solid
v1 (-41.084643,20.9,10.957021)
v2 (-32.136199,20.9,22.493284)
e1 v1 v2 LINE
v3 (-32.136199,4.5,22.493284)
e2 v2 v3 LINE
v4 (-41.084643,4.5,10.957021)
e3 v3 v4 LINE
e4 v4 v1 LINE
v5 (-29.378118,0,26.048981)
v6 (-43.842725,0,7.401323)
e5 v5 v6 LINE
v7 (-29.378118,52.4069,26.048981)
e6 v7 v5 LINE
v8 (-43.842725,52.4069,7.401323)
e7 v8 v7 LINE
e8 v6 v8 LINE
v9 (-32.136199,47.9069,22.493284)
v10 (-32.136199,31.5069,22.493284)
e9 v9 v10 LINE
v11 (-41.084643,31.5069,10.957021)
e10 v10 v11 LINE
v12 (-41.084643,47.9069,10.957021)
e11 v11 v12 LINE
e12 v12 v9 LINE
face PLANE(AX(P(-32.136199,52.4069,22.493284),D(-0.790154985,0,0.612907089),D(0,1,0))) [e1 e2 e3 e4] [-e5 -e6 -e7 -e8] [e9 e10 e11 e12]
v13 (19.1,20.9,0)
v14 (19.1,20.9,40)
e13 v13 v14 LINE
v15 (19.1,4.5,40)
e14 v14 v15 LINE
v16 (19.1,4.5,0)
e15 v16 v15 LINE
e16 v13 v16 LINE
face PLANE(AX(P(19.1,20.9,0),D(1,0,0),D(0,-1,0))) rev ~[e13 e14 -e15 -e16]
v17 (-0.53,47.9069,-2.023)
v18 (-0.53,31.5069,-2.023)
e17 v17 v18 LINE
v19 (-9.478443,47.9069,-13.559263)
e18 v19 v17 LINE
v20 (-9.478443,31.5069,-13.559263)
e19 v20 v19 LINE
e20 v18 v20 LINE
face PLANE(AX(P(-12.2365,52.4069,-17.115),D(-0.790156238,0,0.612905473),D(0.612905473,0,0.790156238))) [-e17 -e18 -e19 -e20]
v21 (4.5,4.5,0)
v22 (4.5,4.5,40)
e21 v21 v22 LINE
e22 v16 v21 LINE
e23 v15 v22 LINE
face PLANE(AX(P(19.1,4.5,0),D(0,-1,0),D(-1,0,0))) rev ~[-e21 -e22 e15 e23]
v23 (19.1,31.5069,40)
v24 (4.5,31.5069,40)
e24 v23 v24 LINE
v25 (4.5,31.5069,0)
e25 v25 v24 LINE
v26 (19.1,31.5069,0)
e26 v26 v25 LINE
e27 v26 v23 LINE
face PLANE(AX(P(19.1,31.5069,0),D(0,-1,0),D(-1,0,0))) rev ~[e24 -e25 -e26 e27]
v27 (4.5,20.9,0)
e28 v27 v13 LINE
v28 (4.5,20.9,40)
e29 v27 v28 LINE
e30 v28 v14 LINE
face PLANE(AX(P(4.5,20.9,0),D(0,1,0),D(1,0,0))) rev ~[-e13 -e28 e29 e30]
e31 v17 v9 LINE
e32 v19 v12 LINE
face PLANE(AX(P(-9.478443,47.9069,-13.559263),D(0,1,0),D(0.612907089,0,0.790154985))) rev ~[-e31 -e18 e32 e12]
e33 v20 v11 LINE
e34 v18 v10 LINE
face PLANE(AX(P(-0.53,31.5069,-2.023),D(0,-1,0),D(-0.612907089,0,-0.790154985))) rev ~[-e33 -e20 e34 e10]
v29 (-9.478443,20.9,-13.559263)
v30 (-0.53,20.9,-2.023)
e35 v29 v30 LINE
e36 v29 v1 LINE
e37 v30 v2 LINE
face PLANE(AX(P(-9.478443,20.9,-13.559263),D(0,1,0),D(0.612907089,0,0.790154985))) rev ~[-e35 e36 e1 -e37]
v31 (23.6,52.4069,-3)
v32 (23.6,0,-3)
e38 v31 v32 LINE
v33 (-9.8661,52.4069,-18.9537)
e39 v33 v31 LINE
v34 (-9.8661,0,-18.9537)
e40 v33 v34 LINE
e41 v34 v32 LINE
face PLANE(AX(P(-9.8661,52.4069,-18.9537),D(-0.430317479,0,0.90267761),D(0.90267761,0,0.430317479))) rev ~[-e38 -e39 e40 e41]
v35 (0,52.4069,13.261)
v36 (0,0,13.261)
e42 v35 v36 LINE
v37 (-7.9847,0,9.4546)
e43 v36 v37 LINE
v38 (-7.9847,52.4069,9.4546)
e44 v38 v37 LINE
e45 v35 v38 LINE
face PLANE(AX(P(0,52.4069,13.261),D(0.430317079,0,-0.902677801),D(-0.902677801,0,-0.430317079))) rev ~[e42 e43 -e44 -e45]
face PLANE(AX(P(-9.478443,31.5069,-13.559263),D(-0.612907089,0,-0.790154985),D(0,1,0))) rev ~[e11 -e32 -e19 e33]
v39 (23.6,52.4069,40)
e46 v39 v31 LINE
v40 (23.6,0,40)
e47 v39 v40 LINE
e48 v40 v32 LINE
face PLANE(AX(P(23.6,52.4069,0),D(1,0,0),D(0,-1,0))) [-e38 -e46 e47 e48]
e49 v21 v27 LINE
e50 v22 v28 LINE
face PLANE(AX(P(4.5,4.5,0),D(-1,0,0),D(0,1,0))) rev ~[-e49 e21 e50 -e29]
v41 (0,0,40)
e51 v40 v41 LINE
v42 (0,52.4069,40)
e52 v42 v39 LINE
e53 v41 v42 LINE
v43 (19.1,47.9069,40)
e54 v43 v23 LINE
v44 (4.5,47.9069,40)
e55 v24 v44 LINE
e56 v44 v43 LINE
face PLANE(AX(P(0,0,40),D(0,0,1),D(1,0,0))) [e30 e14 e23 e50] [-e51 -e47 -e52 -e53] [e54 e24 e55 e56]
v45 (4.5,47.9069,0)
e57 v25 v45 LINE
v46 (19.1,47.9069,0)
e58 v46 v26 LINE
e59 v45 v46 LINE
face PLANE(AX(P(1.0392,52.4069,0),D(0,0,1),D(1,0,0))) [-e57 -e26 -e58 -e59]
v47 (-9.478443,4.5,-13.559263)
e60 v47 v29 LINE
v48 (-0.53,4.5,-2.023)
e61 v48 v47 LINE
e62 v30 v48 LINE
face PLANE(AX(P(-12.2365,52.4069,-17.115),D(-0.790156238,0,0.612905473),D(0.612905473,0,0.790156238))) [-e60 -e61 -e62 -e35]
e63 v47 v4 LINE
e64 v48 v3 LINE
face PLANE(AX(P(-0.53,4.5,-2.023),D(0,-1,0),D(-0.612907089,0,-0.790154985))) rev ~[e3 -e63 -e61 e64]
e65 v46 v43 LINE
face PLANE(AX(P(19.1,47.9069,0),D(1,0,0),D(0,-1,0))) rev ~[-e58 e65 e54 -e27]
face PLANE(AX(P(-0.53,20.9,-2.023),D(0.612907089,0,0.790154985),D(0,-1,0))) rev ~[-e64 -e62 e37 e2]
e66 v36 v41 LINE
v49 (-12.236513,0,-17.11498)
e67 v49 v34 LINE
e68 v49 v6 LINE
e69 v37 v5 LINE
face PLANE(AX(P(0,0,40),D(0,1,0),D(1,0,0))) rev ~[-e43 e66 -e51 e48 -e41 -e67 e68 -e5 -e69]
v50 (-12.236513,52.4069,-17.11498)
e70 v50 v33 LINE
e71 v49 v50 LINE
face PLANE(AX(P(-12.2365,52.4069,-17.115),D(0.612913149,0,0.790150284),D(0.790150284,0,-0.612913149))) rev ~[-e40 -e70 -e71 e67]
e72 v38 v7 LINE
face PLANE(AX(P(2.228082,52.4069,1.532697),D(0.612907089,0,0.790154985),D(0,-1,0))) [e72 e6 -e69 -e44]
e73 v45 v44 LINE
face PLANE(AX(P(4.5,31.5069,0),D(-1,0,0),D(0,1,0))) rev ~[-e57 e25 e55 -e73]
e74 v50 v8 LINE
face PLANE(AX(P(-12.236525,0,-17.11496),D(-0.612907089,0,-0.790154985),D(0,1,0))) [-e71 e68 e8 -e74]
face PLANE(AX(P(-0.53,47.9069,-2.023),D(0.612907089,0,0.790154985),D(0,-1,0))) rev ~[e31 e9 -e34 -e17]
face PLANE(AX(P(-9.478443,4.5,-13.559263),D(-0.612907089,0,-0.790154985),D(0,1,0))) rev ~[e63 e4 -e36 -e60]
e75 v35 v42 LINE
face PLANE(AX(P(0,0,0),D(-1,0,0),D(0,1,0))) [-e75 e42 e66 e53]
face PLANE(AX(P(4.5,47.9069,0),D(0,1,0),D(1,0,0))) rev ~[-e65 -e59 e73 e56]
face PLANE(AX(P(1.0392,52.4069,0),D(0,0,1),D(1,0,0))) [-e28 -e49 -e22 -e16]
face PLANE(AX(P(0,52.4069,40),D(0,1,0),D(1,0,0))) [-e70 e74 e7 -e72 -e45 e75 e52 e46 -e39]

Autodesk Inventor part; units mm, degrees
ref_plane "YZ Plane" through (0, 0, 0) normal (1, 0, 0) x (0, 1, 0)
ref_plane "XZ Plane" through (0, 0, 0) normal (0, 1, 0) x (-1, 0, 0)
sketch "Sketch1" plane through (0, 0, 0) normal (0, 0, 1) x (1, 0, 0)
  line L0 (19.1, 20.9) -> (4.5, 20.9) construction
  line L1 (19.1, 20.9) -> (19.1, 4.5) construction
  line L2 (19.1, 4.5) -> (4.5, 4.5) construction
  line L3 (4.5, 4.5) -> (4.5, 20.9) construction
  line L4 (4.5, 47.9069) -> (4.5, 31.5069) construction
  line L5 (19.1, 47.9069) -> (4.5, 47.9069) construction
  line L6 (19.1, 31.5069) -> (19.1, 47.9069) construction
  line L7 (4.5, 31.5069) -> (19.1, 31.5069) construction
  line L8 (0, 0) -> (0, 52.4069) construction
  line L9 (0, 0) -> (23.6, 0) construction
  line L10 (23.6, 0) -> (23.6, 52.4069) construction
  line L11 (0, 52.4069) -> (23.6, 52.4069) construction
  line L12 (0, 52.4069) -> (0, 0) construction
  line L13 (23.6, 0) -> (23.6, 52.4069) construction
  line L14 (0, 52.4069) -> (23.6, 52.4069)
  line L15 (23.6, 52.4069) -> (23.6, 0)
  line L16 (23.6, 0) -> (0, 0)
  line L17 (0, 0) -> (0, 52.4069)
  line L18 (4.5, 4.5) -> (4.5, 20.9) construction
  line L19 (19.1, 20.9) -> (19.1, 4.5) construction
  line L20 (4.5, 20.9) -> (19.1, 20.9)
  line L21 (19.1, 20.9) -> (19.1, 4.5)
  line L22 (19.1, 4.5) -> (4.5, 4.5)
  line L23 (4.5, 4.5) -> (4.5, 20.9)
  line L24 (4.5, 47.9069) -> (19.1, 47.9069)
  line L25 (19.1, 47.9069) -> (19.1, 31.5069)
  line L26 (19.1, 31.5069) -> (4.5, 31.5069)
  line L27 (4.5, 31.5069) -> (4.5, 47.9069)
  point P0 (0, 0)
  point P1 (-49.87, 37.7316)
extrude "Extrusion1" add sketch "Sketch1" along normal blind 40
sketch "Sketch2" plane through (0, 52.4069, 0) normal (0, 1, 0) x (1, 0, 0)
  line L0 (0, 0) -> (23.6, 0) construction
  line L1 (0, 0) -> (0, -40) construction
  line L2 (23.6, -40) -> (0, -40) construction
  line L3 (23.6, 0) -> (23.6, -40) construction
  line L4 (4.5, 0) -> (-0.53, 0)
  line L5 (4.5, 0) -> (9.53, 0) construction
  line L6 (-0.53, 0) -> (-0.53, 2.023)
  line L7 (-0.53, 0) -> (1.493, 0) construction
ref_plane "Work Plane1" through (-0.53, 52.4069, -2.023) normal (-0.790155, 0, 0.6129071) x (0, 1, 0)
sketch "Sketch3" plane through (-0.53, 52.4069, -2.023) normal (-0.790155, 0, 0.6129071) x (0, 1, 0)
  line L0 (-20.9, 14.6) -> (-20.9, 0) construction
  line L1 (-20.9, 14.6) -> (-4.5, 14.6) construction
  line L2 (-4.5, 14.6) -> (-4.5, 0) construction
  line L3 (-4.5, 0) -> (-20.9, 0) construction
  line L4 (-47.9069, 0) -> (-31.5069, 0) construction
  line L5 (-47.9069, 14.6) -> (-47.9069, 0) construction
  line L6 (-31.5069, 14.6) -> (-47.9069, 14.6) construction
  line L7 (-31.5069, 0) -> (-31.5069, 14.6) construction
  line L8 (0, -4.5) -> (-52.4069, -4.5) construction
  line L9 (0, -4.5) -> (0, 19.1) construction
  line L10 (0, 19.1) -> (-52.4069, 19.1) construction
  line L11 (-52.4069, -4.5) -> (-52.4069, 19.1) construction
  line L12 (-52.4069, -4.5) -> (0, -4.5) construction
  line L13 (0, 19.1) -> (-52.4069, 19.1) construction
  line L14 (-52.4069, -4.5) -> (-52.4069, 19.1)
  line L15 (-52.4069, 19.1) -> (0, 19.1)
  line L16 (0, 19.1) -> (0, -4.5)
  line L17 (0, -4.5) -> (-52.4069, -4.5)
  line L18 (-4.5, 0) -> (-20.9, 0) construction
  line L19 (-20.9, 14.6) -> (-4.5, 14.6) construction
  line L20 (-20.9, 0) -> (-20.9, 14.6)
  line L21 (-20.9, 14.6) -> (-4.5, 14.6)
  line L22 (-4.5, 14.6) -> (-4.5, 0)
  line L23 (-4.5, 0) -> (-20.9, 0)
  line L24 (-47.9069, 0) -> (-47.9069, 14.6)
  line L25 (-47.9069, 14.6) -> (-31.5069, 14.6)
  line L26 (-31.5069, 14.6) -> (-31.5069, 0)
  line L27 (-31.5069, 0) -> (-47.9069, 0)
  point P0 (-52.4069, -1.9233)
  point P1 (-49.87, 37.7316)
  point P2 (-4.5, 0)
extrude "Extrusion2" add sketch "Sketch3" along normal blind 40
sketch "Sketch4" plane through (0, 52.4069, 40) normal (0, 1, 0) x (1, 0, 0)
  line L0 (-12.2365, 57.115) -> (-43.8427, 32.5987) construction
  line L1 (1.0392, 40) -> (23.6, 40) construction
  line L2 (23.6, 40) -> (23.6, 43)
  line L3 (23.6, 40) -> (26.6, 40) construction
  line L4 (-12.2365, 57.115) -> (-9.8661, 58.9537)
  line L5 (-9.8661, 58.9537) -> (23.6, 43)
  line L6 (1.0392, 40) -> (-12.2365, 57.115) construction
  line L7 (-12.2365, 57.115) -> (1.0392, 40)
  line L8 (23.6, 40) -> (1.0392, 40) construction
  line L9 (1.0392, 40) -> (23.6, 40)
  point P0 (0, 40)
  point P1 (4.5, 40)
  point P2 (-0.53, 42.023)
  dimension "d9" = 3
  dimension "d10" = 90
  dimension "d11" = 3
extrude "Extrusion3" add sketch "Sketch4" against normal up to surface (52.4069 mm away)
sketch "Sketch5" plane through (0, 52.4069, 40) normal (0, 1, 0) x (1, 0, 0)
  line L0 (-9.8661, 58.9537) -> (23.6, 43) construction
  line L1 (0, 36.739) -> (0, 0) construction
  line L2 (0, 36.739) -> (0, 26.739)
  line L3 (0, 26.739) -> (-7.9847, 30.5454)
  line L4 (0, 36.739) -> (-7.9847, 30.5454)
  line L5 (0, 36.739) -> (-29.3781, 13.951) construction
  point P0 (0, 40)
extrude "Extrusion4" add sketch "Sketch5" against normal up to surface (52.4069 mm away)
properties part number "backwheel_Cap"
